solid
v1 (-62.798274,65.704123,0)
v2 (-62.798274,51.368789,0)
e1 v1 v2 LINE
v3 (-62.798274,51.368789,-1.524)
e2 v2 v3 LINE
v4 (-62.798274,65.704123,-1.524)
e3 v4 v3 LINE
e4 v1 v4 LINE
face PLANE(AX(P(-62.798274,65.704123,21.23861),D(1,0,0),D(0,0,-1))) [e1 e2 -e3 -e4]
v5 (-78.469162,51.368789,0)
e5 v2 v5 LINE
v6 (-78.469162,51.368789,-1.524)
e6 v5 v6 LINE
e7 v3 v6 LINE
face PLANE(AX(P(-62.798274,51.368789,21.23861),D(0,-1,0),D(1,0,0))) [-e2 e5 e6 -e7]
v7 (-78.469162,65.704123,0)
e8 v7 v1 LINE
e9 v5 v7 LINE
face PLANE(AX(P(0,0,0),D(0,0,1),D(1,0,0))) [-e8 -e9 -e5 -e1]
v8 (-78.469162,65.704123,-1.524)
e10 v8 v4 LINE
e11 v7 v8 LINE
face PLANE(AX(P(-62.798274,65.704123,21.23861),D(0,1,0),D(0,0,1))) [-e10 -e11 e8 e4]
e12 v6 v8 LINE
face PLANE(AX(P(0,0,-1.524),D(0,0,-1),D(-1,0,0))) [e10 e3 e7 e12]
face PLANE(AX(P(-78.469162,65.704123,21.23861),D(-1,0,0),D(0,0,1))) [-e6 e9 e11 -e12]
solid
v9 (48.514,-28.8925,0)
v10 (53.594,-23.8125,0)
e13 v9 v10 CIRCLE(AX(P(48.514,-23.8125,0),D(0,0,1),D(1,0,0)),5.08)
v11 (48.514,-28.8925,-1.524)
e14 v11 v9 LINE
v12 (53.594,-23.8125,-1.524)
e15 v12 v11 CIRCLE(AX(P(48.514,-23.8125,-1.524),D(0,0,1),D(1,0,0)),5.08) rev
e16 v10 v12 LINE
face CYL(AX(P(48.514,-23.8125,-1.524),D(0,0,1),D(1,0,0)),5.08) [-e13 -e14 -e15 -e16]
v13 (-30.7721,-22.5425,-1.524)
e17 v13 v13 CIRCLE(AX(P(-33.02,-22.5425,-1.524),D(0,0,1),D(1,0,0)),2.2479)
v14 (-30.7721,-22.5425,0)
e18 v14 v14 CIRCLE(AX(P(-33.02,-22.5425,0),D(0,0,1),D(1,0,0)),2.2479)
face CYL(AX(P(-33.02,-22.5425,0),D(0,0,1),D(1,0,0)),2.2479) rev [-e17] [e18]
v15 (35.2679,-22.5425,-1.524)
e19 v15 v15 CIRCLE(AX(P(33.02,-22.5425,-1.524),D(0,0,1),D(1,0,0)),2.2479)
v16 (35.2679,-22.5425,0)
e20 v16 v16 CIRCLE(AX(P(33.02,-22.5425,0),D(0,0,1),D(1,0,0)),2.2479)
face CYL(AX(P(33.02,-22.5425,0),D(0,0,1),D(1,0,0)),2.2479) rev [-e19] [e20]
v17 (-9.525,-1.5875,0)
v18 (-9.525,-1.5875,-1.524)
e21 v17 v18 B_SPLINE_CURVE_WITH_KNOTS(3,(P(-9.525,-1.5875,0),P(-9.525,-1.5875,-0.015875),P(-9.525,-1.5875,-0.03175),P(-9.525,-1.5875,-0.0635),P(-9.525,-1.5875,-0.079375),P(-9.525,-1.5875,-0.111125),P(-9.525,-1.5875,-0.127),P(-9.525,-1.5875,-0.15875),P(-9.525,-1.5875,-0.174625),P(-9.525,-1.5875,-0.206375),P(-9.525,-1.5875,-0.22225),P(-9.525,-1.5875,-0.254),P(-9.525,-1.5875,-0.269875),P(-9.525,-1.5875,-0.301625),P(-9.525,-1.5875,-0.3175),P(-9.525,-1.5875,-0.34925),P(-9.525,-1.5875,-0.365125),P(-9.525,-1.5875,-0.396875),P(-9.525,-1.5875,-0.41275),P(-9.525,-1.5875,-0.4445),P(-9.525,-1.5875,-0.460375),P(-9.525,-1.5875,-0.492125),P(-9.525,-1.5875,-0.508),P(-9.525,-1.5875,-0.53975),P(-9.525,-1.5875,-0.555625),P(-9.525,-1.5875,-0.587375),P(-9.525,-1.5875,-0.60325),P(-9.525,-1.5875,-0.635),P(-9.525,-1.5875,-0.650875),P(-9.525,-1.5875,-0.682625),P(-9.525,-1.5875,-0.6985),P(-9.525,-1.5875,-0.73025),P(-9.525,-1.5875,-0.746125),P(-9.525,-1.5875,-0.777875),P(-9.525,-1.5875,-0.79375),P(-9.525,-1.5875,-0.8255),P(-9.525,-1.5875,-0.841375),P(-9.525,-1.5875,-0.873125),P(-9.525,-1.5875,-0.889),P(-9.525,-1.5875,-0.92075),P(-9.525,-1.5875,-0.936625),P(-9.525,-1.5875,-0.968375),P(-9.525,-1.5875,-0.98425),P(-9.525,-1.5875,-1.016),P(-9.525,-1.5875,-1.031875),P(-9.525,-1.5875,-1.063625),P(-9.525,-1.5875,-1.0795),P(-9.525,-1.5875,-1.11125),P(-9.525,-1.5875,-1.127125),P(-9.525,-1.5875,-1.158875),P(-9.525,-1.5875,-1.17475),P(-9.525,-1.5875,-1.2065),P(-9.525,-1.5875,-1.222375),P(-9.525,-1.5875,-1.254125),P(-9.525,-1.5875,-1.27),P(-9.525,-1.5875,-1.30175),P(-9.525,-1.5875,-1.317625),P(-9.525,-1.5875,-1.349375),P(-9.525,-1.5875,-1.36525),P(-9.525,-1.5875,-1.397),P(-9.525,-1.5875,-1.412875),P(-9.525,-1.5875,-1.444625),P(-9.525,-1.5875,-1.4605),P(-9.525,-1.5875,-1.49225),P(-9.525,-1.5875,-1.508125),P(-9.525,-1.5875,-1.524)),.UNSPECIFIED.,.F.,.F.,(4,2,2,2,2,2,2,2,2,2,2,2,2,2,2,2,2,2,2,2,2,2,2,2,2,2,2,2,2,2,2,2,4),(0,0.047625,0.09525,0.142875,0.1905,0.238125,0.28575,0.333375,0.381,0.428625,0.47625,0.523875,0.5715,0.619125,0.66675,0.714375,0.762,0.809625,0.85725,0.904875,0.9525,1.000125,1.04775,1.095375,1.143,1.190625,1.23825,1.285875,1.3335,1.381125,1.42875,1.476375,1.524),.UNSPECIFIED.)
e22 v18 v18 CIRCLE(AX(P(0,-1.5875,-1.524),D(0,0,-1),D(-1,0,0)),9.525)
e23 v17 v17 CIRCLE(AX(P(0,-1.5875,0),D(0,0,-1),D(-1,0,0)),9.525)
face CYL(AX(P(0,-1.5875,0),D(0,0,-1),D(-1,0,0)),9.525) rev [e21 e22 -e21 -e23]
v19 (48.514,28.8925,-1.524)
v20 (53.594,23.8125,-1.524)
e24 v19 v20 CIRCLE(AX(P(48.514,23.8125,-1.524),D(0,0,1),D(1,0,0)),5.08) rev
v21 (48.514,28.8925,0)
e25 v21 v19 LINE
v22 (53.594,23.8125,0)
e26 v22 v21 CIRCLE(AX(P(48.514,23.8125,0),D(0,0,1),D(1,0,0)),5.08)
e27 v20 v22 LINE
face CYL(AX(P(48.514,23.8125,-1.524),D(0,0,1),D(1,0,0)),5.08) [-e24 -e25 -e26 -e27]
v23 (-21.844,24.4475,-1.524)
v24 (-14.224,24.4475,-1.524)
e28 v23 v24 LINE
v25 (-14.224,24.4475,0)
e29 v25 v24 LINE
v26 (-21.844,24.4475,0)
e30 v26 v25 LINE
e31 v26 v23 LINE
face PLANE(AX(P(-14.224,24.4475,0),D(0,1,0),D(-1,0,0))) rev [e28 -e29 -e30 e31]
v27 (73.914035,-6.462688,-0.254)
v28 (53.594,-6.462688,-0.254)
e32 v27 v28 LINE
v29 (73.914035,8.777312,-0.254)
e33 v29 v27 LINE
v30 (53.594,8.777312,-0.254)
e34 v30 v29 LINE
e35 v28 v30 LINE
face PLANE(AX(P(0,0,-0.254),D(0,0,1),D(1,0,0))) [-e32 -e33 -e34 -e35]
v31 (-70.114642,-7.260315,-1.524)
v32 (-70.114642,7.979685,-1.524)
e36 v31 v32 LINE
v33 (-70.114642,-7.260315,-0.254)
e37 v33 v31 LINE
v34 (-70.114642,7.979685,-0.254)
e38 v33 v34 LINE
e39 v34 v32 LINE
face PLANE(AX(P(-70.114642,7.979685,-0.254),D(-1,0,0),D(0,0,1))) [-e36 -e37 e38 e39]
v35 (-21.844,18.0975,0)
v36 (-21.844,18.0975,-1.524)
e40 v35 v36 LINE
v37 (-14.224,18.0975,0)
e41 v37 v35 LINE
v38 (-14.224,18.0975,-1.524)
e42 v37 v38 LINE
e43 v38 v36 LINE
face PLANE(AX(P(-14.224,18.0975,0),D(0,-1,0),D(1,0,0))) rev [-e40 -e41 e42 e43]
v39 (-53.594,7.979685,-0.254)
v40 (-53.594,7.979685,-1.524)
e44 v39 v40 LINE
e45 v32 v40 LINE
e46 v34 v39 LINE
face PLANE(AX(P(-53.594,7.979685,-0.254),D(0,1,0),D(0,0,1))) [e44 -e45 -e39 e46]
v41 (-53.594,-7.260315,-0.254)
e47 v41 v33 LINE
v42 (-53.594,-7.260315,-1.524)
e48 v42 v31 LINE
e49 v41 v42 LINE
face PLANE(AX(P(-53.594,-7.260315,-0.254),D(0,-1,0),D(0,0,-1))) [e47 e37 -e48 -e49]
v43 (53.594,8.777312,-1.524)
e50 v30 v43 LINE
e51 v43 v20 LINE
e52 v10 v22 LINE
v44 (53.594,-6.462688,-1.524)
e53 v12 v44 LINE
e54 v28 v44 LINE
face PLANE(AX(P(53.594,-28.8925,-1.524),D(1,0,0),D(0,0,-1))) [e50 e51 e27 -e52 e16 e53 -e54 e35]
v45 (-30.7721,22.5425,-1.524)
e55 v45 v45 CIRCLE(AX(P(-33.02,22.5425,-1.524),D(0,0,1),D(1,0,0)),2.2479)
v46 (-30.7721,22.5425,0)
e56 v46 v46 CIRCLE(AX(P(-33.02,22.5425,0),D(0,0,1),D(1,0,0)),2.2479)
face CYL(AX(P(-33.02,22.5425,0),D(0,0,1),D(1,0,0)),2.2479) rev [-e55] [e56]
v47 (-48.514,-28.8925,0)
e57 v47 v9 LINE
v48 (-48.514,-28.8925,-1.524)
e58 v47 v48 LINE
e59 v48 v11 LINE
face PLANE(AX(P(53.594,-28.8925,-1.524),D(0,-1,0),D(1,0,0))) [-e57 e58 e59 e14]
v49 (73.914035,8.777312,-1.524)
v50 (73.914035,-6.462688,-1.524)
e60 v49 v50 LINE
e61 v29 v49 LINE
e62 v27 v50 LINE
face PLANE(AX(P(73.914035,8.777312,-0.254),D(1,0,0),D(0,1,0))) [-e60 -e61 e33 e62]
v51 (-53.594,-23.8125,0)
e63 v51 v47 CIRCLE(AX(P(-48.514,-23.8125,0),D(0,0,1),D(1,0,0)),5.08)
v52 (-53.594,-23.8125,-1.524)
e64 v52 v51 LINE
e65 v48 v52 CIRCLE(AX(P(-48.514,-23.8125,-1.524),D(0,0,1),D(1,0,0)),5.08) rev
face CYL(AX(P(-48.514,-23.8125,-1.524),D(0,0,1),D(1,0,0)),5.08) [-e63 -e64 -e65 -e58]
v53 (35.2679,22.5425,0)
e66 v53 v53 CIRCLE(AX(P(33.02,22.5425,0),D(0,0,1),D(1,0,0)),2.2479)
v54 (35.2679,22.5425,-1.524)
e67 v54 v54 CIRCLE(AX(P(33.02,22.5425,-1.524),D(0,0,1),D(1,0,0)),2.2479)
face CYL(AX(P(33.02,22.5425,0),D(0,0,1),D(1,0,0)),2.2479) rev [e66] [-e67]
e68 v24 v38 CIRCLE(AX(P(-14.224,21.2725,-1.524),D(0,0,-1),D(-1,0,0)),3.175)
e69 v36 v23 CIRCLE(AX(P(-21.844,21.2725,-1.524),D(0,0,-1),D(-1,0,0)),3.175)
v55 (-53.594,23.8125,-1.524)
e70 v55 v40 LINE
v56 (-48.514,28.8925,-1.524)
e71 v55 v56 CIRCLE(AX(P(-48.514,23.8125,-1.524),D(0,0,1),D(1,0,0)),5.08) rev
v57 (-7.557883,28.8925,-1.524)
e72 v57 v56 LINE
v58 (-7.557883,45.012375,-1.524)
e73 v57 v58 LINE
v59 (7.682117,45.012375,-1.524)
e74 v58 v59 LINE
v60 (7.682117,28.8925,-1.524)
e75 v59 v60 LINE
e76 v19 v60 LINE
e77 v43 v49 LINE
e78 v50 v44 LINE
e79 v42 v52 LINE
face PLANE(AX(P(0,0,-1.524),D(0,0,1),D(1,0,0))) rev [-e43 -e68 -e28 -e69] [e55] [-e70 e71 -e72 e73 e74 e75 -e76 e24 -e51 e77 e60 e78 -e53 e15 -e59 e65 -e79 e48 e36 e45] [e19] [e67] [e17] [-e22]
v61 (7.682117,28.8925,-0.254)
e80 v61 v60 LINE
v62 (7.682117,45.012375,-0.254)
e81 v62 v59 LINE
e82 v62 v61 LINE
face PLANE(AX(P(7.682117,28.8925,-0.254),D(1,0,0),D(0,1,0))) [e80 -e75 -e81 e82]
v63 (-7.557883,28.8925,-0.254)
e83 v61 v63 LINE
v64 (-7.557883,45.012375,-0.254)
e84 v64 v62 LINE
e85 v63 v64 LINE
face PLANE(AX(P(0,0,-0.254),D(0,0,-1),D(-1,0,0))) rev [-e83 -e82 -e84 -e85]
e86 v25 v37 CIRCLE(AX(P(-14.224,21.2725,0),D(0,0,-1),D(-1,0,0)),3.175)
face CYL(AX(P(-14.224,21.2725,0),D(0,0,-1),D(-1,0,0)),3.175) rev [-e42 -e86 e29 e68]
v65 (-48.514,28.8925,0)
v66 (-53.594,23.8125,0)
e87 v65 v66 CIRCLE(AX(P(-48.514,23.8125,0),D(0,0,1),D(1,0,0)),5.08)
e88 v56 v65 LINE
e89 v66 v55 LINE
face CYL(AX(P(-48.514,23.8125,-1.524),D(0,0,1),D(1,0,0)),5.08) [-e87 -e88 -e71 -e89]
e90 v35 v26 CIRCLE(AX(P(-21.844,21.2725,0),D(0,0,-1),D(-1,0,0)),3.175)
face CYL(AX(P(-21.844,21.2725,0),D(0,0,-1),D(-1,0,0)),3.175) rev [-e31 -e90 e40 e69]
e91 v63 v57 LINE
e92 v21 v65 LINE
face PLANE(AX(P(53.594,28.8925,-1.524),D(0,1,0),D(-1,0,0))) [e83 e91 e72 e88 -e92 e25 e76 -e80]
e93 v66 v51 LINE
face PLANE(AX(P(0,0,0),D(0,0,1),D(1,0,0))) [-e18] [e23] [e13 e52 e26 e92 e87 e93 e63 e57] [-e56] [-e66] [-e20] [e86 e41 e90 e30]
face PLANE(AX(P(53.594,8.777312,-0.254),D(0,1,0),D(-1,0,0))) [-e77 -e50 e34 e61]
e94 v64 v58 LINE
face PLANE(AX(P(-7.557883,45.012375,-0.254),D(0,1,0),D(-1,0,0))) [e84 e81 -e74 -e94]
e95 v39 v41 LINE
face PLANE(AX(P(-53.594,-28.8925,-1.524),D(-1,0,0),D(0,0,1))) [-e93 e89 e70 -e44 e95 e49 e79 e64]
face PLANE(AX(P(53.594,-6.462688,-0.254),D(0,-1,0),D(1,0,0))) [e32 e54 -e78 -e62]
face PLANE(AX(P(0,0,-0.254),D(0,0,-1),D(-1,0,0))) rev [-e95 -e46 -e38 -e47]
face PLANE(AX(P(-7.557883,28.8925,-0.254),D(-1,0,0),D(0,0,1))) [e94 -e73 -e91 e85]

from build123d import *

# Parameters (mm, degrees)
SKETCH1_W                   = 107.188
SKETCH1_H                   = 57.785
BASE_FLANGE1_DEPTH          = 1.524
F_16_0_177_DIAMETER_HOLE1_D = 4.4958
SKETCH9_R                   = 9.525
CUT_EXTRUDE1_DEPTH          = 61.904974906
FILLET1_R                   = 5.08
SKETCH21_W                  = 15.670888323
SKETCH21_H                  = 14.335334597
BOSS_EXTRUDE2_DEPTH         = 1.524
SKETCH26_W                  = 16.520642104
SKETCH26_H                  = 15.24
SKETCH26_W_2                = 20.320035359
SKETCH26_W_3                = 15.24
SKETCH26_H_2                = 16.119874992
BOSS_EXTRUDE3_DEPTH         = 1.27


# Sheet-metal steps are written as plain solids
with BuildPart() as part:
    # Sketch1 → Base-Flange1 (new body)
    with BuildSketch(Plane.XY):
        Rectangle(SKETCH1_W, SKETCH1_H)
    extrude(amount=-BASE_FLANGE1_DEPTH)

    # #16 (0.177) Diameter Hole1 (through all)
    with Locations(Plane.XY):
        with Locations((-33.02, 22.5425), (33.02, 22.5425), (33.02, -22.5425), (-33.02, -22.5425)):
            Hole(F_16_0_177_DIAMETER_HOLE1_D / 2)

    # Sketch9 → Cut-Extrude1 (cut, through all)
    with BuildSketch(Plane(origin=(0, 0, -1.524), x_dir=(-1, 0, 0), z_dir=(0, 0, -1))):
        with Locations((0, -1.5875)):
            Circle(SKETCH9_R)
        with BuildLine():
            Line((14.224, 24.4475), (21.844, 24.4475))
            ThreePointArc((21.844, 24.4475), (25.019, 21.2725), (21.844, 18.0975))
            Line((21.844, 18.0975), (14.224, 18.0975))
            ThreePointArc((14.224, 18.0975), (11.049, 21.2725), (14.224, 24.4475))
        make_face()
    extrude(amount=-CUT_EXTRUDE1_DEPTH, mode=Mode.SUBTRACT)

    # Fillet1
    fillet1_edges = [part.edges().sort_by_distance(p)[0] for p in [
        (-53.594, 28.8925, -0.762),
        (53.594, 28.8925, -0.762),
        (53.594, -28.8925, -0.762),
        (-53.594, -28.8925, -0.762),
    ]]
    fillet(fillet1_edges, radius=FILLET1_R)

    # Sketch26 → Boss-Extrude3 (add)
    with BuildSketch(Plane(origin=(0, 0, -1.524), x_dir=(-1, 0, 0), z_dir=(0, 0, -1))):
        with Locations((61.854321052, 0.35968498)):
            Rectangle(SKETCH26_W, SKETCH26_H)
        with Locations((-63.75401768, 1.15731215)):
            Rectangle(SKETCH26_W_2, SKETCH26_H)
        with Locations((-0.062117332, 36.952437496)):
            Rectangle(SKETCH26_W_3, SKETCH26_H_2)
    extrude(amount=-BOSS_EXTRUDE3_DEPTH)


with BuildPart() as body_2:
    # Sketch21 → Boss-Extrude2 (new body)
    with BuildSketch(Plane(origin=(0, 0, -1.524), x_dir=(-1, 0, 0), z_dir=(0, 0, -1))):
        with Locations((70.633718088, 58.536455808)):
            Rectangle(SKETCH21_W, SKETCH21_H)
    extrude(amount=-BOSS_EXTRUDE2_DEPTH)


solid = Compound([part.part, body_2.part])
